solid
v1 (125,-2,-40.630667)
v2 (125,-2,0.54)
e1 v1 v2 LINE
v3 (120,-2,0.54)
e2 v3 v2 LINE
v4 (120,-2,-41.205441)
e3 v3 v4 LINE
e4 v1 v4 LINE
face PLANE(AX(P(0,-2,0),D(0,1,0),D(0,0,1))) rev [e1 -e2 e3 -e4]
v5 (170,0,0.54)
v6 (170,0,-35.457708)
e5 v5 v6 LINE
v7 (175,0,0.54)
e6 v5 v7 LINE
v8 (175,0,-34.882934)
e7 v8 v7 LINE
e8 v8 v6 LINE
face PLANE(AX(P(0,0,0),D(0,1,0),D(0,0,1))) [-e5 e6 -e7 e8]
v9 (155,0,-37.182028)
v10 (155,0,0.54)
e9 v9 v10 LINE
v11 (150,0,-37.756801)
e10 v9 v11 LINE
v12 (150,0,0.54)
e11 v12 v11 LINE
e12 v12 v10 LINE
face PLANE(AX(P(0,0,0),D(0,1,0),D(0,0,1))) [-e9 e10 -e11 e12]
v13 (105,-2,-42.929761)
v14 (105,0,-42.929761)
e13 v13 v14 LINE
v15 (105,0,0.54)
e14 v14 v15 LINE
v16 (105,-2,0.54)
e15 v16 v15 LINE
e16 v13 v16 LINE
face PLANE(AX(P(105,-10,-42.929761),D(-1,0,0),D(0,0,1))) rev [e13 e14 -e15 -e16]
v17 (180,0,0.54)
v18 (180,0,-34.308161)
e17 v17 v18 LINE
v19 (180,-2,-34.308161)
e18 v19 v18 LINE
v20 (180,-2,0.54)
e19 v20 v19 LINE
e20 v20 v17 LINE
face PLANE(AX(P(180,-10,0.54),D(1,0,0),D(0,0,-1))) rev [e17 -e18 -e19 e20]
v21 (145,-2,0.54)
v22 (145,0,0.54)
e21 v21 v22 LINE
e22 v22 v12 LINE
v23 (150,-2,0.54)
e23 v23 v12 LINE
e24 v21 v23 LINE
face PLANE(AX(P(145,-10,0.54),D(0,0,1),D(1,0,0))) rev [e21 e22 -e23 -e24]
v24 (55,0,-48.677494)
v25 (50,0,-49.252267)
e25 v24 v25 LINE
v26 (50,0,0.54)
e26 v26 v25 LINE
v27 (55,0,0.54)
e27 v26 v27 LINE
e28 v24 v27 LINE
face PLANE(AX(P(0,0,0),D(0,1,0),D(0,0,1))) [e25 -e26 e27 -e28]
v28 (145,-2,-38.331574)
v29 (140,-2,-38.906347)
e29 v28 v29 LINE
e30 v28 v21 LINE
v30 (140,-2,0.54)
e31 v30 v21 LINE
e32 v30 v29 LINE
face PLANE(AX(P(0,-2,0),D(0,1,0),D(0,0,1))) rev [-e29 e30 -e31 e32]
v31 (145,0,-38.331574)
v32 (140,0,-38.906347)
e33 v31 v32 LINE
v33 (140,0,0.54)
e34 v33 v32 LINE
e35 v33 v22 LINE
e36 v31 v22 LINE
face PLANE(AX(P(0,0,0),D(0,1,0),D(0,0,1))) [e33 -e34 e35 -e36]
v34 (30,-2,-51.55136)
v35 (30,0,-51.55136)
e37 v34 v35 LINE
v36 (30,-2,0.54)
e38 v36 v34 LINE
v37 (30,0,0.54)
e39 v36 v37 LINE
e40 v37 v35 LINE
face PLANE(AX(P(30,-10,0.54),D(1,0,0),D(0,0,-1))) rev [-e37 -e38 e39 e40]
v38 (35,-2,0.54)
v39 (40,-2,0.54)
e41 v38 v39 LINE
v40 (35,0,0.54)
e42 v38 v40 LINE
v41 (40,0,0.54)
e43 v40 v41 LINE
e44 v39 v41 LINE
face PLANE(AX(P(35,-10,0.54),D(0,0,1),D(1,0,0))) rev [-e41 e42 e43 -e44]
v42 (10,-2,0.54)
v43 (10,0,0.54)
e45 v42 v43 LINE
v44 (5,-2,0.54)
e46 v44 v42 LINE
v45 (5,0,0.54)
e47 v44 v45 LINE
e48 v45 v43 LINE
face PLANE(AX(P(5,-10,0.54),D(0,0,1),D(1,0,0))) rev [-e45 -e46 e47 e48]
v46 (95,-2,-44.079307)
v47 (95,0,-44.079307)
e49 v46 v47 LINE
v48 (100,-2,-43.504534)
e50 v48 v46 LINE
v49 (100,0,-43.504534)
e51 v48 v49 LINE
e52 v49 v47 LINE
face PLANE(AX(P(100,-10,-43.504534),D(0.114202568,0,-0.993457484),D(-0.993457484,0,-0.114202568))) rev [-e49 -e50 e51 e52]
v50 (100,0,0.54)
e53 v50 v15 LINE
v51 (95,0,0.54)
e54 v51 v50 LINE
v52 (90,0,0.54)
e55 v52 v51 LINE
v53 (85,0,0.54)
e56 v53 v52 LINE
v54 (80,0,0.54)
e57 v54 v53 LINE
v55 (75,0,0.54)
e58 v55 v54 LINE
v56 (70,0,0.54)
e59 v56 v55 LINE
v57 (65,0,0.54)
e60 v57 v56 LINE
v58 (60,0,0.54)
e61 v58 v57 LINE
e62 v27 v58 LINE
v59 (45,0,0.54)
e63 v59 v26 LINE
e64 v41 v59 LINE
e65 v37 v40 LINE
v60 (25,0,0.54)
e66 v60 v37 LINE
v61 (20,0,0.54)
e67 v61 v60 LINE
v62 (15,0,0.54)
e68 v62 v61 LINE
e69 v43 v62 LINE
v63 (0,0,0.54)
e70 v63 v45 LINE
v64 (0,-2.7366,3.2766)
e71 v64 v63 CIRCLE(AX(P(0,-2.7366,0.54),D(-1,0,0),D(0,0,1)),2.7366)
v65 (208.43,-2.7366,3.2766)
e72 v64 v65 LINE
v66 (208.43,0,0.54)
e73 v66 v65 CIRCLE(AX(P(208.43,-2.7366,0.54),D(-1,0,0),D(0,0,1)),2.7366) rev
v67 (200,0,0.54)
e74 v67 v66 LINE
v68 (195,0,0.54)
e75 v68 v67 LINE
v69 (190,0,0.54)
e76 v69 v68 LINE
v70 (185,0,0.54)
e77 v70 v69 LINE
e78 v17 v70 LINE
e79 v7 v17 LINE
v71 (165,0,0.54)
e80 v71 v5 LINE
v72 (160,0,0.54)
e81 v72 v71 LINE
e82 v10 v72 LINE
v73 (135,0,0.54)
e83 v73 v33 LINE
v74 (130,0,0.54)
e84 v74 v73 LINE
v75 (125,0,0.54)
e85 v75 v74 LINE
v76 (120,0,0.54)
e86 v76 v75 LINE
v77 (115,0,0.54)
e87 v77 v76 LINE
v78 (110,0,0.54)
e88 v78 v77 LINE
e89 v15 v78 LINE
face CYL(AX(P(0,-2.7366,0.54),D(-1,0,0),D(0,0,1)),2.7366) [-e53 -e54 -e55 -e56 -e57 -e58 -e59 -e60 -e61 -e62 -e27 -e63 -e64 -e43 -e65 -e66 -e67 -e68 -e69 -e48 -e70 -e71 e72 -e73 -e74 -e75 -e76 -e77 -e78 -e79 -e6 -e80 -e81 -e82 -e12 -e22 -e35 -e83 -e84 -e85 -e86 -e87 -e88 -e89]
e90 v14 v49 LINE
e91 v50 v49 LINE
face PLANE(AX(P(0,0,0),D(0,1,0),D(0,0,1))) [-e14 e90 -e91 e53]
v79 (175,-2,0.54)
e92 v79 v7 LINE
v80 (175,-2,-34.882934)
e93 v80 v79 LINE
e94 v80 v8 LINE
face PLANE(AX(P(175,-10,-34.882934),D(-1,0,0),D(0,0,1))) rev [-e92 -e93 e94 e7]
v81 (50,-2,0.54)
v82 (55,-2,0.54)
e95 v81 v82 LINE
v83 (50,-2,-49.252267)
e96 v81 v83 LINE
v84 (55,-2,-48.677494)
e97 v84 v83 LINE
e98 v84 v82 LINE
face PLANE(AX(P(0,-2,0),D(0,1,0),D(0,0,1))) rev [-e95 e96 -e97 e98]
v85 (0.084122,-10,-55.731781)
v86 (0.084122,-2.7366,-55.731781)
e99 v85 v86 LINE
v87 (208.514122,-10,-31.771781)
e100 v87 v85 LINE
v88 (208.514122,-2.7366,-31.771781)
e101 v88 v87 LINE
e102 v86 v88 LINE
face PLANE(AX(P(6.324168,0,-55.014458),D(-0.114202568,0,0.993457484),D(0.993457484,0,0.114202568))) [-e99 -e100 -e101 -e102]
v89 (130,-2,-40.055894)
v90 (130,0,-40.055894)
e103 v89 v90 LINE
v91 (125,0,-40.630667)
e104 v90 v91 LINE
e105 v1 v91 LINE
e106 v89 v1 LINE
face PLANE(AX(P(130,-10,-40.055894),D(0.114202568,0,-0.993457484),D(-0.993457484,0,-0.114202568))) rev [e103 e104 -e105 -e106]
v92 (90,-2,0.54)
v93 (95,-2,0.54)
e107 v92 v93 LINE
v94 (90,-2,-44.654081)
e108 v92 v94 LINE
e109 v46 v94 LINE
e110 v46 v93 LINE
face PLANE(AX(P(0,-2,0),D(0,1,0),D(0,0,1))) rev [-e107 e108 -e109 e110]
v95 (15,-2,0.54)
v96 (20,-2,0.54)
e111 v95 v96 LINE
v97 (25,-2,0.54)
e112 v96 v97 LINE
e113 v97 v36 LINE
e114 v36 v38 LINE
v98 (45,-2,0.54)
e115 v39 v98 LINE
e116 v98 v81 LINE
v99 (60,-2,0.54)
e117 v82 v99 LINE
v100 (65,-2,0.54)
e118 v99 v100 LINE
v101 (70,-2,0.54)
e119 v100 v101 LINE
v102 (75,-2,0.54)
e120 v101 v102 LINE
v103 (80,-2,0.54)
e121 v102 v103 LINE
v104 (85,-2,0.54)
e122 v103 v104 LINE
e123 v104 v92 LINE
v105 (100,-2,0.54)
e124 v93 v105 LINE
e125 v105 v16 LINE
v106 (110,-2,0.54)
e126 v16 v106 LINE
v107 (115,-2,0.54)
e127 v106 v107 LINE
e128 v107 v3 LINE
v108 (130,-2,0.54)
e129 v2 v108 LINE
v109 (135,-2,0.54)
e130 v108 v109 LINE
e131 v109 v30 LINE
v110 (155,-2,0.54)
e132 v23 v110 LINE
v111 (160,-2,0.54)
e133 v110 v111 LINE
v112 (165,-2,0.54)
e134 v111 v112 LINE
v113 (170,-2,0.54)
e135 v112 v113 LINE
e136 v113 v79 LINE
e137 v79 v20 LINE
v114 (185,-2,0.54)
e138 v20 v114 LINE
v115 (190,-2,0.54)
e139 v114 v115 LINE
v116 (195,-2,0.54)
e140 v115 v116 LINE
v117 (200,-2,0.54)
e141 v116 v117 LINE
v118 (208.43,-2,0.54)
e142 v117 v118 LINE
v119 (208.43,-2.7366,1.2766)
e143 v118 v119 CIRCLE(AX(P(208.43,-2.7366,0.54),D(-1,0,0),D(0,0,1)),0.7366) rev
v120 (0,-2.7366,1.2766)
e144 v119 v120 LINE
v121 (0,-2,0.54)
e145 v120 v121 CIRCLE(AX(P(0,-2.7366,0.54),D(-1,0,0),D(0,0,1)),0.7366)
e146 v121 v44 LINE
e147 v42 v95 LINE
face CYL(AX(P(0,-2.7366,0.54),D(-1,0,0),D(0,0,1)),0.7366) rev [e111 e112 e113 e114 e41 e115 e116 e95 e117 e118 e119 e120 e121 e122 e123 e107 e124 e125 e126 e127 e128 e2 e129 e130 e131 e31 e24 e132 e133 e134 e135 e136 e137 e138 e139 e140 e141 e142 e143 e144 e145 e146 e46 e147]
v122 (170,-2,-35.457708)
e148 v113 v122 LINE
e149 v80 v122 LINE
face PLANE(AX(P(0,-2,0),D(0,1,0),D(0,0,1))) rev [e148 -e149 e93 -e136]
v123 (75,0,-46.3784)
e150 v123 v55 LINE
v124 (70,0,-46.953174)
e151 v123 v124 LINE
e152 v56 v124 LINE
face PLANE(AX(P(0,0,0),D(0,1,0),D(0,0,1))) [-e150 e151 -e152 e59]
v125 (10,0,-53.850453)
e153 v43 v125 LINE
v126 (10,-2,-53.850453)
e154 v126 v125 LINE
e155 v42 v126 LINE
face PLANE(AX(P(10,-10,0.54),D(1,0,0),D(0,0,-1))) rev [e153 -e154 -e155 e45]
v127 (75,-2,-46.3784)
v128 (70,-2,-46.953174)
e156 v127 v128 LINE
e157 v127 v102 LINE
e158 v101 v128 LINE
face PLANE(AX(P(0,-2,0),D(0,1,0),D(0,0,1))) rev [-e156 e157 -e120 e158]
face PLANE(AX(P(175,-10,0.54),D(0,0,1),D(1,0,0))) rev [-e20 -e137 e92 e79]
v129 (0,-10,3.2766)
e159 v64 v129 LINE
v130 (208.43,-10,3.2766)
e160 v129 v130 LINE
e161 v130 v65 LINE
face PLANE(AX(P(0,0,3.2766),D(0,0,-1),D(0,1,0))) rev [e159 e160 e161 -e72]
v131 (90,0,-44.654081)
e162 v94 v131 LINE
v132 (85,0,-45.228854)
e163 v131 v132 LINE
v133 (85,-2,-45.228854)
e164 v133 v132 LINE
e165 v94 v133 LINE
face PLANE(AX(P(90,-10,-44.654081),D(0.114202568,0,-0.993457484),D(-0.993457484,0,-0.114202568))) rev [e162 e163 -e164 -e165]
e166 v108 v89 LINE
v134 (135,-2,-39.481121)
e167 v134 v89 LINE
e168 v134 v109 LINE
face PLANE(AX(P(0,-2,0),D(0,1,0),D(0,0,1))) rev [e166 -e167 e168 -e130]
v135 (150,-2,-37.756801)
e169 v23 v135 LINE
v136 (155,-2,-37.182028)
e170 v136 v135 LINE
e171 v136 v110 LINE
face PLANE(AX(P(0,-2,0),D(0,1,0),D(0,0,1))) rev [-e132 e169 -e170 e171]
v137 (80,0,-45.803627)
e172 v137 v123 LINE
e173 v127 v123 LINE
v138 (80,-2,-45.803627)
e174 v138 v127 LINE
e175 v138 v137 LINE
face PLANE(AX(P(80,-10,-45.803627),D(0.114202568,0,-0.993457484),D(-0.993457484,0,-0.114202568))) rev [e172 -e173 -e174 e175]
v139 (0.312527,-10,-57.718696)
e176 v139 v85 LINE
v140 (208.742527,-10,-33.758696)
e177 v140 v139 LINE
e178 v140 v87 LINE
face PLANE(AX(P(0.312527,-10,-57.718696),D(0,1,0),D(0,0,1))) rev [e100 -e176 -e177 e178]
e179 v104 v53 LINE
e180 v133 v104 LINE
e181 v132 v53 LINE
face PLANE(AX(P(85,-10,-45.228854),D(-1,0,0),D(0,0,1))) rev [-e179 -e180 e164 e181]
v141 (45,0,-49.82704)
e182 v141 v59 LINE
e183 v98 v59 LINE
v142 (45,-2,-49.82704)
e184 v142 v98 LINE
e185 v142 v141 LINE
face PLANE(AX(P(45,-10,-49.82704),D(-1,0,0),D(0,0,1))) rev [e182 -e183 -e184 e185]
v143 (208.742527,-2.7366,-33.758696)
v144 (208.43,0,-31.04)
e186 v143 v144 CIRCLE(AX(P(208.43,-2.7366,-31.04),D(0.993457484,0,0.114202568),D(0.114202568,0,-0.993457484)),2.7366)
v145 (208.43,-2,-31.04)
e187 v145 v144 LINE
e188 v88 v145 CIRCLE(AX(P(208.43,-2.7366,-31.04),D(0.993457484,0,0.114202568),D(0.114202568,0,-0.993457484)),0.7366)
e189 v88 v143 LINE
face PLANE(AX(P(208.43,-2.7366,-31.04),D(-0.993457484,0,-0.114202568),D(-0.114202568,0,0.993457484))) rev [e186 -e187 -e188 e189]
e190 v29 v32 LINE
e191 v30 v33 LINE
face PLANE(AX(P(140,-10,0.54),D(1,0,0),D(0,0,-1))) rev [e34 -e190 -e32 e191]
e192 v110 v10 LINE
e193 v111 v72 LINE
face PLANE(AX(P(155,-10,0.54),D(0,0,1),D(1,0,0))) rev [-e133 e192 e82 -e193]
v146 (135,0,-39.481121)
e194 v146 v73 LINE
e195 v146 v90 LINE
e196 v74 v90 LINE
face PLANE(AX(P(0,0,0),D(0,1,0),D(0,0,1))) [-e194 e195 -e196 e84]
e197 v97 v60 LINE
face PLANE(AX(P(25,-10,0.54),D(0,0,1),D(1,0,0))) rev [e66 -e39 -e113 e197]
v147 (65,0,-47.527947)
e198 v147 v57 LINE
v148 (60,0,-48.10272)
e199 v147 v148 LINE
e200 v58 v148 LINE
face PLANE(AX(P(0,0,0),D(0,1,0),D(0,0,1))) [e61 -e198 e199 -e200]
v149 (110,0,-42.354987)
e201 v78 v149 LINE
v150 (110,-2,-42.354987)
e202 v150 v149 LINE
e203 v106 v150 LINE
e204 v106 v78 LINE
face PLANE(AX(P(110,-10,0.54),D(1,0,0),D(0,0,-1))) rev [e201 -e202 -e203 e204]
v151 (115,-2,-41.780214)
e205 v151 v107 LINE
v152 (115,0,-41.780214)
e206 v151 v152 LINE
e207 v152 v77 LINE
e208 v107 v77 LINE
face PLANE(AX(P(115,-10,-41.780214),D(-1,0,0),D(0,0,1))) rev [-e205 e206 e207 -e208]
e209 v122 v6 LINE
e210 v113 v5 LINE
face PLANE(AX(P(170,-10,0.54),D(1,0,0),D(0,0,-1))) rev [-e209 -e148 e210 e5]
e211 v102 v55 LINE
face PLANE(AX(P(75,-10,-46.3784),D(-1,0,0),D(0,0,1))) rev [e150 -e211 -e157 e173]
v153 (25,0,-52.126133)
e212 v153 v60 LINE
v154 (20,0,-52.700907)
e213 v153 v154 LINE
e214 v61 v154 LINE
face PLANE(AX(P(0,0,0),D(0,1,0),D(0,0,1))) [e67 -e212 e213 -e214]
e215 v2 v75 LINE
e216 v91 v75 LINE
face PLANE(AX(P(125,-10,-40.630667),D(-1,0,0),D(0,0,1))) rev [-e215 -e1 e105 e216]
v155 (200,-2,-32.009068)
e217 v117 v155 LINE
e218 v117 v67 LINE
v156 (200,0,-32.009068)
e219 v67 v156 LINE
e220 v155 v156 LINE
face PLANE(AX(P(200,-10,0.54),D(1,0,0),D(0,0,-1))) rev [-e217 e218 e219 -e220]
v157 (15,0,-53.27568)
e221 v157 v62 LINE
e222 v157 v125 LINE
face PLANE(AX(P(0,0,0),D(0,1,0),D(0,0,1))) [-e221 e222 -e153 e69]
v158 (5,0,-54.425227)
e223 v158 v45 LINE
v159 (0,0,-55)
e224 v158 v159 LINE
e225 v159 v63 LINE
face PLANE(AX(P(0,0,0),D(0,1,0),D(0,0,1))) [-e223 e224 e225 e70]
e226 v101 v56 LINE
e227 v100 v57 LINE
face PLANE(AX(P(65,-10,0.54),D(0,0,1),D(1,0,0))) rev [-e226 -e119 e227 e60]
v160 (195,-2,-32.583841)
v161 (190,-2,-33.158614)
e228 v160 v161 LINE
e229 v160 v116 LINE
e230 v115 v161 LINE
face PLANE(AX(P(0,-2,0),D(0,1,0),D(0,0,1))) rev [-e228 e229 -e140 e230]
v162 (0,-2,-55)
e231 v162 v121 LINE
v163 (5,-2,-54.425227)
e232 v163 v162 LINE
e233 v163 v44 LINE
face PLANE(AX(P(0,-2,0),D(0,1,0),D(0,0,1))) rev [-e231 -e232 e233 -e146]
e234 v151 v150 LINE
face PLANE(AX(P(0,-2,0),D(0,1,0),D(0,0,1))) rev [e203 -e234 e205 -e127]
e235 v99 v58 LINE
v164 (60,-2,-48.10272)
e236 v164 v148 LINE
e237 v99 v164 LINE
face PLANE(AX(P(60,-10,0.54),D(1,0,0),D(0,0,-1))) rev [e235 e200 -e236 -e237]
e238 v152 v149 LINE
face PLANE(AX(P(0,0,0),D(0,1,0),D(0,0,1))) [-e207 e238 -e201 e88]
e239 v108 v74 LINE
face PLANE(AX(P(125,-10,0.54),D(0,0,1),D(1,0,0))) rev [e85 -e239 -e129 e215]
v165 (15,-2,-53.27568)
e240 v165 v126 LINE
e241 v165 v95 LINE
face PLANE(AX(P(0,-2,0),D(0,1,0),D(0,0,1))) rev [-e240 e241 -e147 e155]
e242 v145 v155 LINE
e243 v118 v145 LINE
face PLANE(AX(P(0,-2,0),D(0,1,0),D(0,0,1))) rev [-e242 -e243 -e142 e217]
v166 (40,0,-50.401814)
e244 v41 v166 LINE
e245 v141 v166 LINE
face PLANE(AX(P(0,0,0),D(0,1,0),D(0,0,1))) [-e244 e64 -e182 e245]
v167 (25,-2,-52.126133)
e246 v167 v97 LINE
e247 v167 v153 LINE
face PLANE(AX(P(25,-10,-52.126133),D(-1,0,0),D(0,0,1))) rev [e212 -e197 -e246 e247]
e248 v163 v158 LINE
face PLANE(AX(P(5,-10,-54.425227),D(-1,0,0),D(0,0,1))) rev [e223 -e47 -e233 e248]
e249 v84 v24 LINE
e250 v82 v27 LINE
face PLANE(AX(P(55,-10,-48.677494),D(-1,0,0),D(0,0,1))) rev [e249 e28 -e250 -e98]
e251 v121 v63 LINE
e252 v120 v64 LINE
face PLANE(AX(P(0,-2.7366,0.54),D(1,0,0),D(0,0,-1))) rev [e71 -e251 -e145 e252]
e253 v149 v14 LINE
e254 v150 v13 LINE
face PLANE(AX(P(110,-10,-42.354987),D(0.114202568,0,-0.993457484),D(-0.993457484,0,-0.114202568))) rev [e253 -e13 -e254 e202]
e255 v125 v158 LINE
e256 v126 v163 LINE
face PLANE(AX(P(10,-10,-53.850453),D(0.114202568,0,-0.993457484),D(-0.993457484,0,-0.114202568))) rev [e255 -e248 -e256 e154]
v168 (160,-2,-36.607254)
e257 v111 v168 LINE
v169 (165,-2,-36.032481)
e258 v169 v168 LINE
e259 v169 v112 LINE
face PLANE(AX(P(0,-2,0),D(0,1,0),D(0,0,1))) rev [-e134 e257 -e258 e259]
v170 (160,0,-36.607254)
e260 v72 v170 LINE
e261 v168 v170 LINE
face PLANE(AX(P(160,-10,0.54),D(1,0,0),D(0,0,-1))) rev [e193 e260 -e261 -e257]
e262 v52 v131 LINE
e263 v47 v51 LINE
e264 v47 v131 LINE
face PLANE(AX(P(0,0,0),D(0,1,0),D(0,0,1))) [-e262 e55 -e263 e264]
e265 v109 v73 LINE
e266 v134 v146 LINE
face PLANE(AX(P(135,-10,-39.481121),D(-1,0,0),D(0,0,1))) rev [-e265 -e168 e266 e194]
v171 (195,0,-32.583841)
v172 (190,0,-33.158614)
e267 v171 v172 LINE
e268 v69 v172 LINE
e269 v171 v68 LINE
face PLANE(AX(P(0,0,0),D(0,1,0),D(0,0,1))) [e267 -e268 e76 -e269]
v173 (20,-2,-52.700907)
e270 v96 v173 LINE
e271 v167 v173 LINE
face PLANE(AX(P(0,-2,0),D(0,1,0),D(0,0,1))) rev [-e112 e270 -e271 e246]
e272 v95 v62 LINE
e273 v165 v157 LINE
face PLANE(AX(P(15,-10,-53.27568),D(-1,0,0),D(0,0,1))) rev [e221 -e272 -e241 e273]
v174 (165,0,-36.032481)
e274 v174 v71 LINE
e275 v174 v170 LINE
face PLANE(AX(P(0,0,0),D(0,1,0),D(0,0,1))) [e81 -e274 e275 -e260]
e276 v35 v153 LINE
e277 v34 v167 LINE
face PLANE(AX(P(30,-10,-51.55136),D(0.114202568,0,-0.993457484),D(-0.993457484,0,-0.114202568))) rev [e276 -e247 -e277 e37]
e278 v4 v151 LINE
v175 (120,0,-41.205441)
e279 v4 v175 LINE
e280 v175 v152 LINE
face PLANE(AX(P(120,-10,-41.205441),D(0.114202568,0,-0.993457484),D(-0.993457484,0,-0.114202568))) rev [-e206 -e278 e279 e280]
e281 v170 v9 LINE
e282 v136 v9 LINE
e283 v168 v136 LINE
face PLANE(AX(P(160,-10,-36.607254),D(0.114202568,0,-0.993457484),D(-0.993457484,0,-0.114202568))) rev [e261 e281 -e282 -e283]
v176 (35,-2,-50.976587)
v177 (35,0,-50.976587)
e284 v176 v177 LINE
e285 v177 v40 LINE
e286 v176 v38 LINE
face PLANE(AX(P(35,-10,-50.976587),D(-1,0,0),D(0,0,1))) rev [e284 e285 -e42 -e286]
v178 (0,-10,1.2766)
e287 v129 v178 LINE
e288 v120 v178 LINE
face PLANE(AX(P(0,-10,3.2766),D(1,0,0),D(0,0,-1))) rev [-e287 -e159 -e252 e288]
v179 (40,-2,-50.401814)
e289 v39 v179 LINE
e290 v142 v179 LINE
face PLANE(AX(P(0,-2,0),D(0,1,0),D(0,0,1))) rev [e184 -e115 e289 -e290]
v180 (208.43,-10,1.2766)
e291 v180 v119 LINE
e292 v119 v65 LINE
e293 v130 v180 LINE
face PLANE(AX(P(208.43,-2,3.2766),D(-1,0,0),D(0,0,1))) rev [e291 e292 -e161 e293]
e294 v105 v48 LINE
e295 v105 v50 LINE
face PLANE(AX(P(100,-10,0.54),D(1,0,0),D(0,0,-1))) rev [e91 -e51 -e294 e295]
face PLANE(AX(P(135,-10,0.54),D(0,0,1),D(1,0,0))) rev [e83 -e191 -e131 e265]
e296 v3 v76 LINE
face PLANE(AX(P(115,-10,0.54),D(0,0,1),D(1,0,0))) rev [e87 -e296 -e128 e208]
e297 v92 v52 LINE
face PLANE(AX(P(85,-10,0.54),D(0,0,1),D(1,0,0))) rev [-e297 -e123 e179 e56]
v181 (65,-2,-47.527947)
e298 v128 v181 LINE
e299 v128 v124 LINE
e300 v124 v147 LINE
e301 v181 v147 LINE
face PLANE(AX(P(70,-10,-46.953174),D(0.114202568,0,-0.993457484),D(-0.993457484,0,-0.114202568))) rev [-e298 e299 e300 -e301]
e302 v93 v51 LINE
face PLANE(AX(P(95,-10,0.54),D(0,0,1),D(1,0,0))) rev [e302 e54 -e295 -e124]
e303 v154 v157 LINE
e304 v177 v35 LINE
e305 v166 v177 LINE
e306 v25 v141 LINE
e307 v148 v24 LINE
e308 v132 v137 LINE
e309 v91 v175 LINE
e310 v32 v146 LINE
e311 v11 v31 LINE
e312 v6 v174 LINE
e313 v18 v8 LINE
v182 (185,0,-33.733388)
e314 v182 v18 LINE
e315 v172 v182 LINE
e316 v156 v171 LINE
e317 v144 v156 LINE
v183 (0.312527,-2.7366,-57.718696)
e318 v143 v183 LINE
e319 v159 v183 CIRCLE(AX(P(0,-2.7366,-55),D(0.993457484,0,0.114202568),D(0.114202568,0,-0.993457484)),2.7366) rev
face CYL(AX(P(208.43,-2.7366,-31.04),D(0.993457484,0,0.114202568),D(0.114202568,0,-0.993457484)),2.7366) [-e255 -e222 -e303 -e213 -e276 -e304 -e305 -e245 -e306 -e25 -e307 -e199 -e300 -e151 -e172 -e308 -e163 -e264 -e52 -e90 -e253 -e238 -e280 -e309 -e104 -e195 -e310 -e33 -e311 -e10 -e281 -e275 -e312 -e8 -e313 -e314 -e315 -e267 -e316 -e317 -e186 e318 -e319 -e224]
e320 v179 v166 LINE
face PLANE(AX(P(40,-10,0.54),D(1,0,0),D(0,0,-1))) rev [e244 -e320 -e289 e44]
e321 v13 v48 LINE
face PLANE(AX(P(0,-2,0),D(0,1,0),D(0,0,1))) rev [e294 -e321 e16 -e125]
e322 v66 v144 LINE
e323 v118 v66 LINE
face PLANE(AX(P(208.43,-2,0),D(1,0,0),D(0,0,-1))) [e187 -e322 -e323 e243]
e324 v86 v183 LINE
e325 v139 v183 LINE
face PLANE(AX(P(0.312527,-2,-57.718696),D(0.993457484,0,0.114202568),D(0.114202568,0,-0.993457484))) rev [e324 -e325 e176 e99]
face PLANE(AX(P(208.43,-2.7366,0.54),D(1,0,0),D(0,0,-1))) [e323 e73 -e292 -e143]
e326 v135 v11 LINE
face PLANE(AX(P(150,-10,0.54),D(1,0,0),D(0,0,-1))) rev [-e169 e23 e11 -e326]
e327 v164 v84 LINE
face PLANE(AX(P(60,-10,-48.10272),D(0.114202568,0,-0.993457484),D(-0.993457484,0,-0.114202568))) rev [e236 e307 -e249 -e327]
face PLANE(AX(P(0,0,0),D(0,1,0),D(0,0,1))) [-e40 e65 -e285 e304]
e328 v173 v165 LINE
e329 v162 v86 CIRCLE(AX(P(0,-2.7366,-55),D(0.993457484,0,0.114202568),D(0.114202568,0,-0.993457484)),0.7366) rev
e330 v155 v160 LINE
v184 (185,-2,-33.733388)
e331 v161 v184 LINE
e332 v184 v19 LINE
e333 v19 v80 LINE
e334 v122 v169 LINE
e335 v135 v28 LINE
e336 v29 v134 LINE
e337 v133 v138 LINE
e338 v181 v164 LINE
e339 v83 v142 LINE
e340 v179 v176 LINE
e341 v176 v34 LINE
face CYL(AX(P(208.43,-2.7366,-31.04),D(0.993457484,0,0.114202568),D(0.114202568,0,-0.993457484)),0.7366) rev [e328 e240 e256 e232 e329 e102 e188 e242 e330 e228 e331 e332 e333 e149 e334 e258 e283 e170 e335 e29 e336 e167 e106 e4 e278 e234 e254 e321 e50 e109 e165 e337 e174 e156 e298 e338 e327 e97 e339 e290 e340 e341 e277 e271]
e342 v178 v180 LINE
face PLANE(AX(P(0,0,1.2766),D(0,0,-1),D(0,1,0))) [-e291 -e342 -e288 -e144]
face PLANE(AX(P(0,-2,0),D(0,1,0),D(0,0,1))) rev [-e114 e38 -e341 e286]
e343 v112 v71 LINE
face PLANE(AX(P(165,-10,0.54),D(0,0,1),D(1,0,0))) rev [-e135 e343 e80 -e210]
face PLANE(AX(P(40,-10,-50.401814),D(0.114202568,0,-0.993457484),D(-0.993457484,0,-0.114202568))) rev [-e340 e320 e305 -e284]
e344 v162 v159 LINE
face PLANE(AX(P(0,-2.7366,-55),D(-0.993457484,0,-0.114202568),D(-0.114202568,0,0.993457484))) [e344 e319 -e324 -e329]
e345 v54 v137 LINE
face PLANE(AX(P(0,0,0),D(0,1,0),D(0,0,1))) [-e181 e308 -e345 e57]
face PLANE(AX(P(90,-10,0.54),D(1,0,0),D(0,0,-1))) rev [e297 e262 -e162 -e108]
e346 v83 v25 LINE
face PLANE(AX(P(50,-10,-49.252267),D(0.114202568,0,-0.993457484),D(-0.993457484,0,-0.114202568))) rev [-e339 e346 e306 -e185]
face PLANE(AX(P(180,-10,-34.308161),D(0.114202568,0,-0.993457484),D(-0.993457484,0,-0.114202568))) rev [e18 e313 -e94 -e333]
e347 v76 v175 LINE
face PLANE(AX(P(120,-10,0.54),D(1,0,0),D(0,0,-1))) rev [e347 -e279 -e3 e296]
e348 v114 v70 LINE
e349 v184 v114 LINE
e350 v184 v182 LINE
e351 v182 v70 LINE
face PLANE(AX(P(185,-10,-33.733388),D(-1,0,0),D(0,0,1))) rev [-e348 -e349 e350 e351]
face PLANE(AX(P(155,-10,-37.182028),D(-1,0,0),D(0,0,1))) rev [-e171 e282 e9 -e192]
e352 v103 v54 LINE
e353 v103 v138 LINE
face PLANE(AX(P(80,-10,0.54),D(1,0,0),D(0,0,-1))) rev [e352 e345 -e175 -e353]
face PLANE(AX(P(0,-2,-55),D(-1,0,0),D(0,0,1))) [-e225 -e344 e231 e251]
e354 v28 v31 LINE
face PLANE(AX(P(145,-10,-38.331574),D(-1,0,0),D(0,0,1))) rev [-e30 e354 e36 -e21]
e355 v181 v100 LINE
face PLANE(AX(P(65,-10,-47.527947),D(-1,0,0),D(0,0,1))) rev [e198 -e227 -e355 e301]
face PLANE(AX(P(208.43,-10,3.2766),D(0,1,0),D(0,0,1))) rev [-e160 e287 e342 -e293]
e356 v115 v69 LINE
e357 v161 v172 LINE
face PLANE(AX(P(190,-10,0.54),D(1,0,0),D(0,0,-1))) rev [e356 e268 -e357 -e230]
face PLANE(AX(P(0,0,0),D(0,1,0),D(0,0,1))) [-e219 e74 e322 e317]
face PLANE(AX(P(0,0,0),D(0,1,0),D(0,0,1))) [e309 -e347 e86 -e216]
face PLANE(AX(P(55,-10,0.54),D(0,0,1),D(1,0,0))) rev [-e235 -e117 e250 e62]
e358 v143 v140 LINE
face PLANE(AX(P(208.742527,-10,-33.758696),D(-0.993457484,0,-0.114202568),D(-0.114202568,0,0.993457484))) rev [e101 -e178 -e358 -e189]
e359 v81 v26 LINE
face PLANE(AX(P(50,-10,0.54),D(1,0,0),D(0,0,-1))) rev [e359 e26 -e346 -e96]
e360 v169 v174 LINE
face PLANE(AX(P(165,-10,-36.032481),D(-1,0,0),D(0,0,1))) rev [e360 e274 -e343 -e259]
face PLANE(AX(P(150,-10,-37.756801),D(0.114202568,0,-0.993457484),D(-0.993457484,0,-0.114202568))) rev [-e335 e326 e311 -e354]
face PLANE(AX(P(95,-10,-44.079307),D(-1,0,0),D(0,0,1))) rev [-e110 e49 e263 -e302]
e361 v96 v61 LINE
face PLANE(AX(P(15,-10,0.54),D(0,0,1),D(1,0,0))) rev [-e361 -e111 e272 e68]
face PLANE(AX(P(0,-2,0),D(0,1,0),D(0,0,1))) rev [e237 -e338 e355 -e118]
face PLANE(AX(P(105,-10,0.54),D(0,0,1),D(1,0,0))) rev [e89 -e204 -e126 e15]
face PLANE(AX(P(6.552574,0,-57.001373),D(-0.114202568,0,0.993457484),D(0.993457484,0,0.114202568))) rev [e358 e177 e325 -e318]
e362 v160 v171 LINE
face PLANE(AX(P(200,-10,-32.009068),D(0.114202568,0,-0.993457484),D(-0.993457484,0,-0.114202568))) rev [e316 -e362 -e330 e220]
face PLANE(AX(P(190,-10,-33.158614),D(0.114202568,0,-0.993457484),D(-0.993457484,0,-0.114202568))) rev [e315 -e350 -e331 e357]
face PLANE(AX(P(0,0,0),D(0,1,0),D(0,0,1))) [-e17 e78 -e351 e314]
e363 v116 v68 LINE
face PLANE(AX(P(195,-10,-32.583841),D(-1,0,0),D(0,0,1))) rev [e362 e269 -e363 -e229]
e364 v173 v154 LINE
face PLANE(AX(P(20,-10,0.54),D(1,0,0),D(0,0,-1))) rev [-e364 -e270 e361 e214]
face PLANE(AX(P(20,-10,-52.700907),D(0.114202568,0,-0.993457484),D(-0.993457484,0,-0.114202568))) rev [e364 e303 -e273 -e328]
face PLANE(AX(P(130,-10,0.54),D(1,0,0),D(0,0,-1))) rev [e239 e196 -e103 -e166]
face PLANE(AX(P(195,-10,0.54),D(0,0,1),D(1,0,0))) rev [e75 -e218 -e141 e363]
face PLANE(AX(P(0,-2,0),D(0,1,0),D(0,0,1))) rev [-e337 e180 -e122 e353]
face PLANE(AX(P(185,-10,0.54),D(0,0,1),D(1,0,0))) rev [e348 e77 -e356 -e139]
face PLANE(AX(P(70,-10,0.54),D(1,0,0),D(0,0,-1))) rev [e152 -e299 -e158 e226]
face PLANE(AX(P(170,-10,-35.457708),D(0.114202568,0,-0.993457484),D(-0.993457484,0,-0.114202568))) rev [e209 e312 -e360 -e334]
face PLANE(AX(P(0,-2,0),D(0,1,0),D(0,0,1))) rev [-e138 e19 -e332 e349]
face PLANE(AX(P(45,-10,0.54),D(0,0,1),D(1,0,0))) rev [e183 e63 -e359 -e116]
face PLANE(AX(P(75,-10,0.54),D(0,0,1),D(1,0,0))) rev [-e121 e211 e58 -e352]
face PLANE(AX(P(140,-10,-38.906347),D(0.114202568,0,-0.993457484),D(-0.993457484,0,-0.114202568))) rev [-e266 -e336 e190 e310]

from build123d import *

# Parameters (mm, degrees)
BASE_FLANGE1_DEPTH = 2
EDGE_FLANGE1_DEPTH = 209.802637019
EDGE_FLANGE2_DEPTH = 208.43
CUT_EXTRUDE1_DEPTH = 10
CUT_EXTRUDE2_DEPTH = 10
CUT_EXTRUDE3_DEPTH = 10
CUT_EXTRUDE4_DEPTH = 10


# Sheet-metal steps are written as plain solids
with BuildPart() as part:
    # Sketch1 → Base-Flange1 (new body)
    with BuildSketch(Plane(origin=(0, 0, 0), x_dir=(1, 0, 0), z_dir=(0, 1, 0))):
        Polygon((0, 0), (208.43, 0), (208.43, 31.04), (0, 55), align=None)
    extrude(amount=-BASE_FLANGE1_DEPTH)

    # Edge-Flange1 section (across the edge) → Edge-Flange1 (add)
    with BuildSketch(Plane(origin=(0.084121612, -2, -55.731780783), x_dir=(-0.1142025683779395, -3.4914813388431334e-15, 0.9934574844329687), z_dir=(0.9934574844329687, 0, 0.1142025683779395))):
        with BuildLine():
            Line((-2, 0.7366), (-2, 8))
            Line((-2, 8), (0, 8))
            Line((0, 8), (0, 0.7366))
            ThreePointArc((0, 0.7366), (0.215745145, 0.215745145), (0.7366, 0))
            Line((0.7366, 0), (0.7366, -2))
            ThreePointArc((0.7366, -2), (-1.198468417, -1.198468417), (-2, 0.7366))
        make_face()
    extrude(amount=EDGE_FLANGE1_DEPTH)

    # Edge-Flange2 section (across the edge) → Edge-Flange2 (add)
    with BuildSketch(Plane(origin=(208.43, -2, 1.2766), x_dir=(0, 0, -1), z_dir=(-1, 0, 0))):
        with BuildLine():
            Line((-2, 0.7366), (-2, 8))
            Line((-2, 8), (0, 8))
            Line((0, 8), (0, 0.7366))
            ThreePointArc((0, 0.7366), (0.215745145, 0.215745145), (0.7366, 0))
            Line((0.7366, 0), (1.2766, 0))
            Line((1.2766, 0), (1.2766, -2))
            Line((1.2766, -2), (0.7366, -2))
            ThreePointArc((0.7366, -2), (-1.198468417, -1.198468417), (-2, 0.7366))
        make_face()
    extrude(amount=EDGE_FLANGE2_DEPTH)

    # Sketch12 → Cut-Extrude1 (cut)
    with BuildSketch(Plane(origin=(0, 0, 0), x_dir=(1, 0, 0), z_dir=(0, 1, 0))):
        Polygon((5, 54.425226695), (5, -0.54), (10, -0.54), (10, 53.85045339), align=None)
    extrude(amount=-CUT_EXTRUDE1_DEPTH, mode=Mode.SUBTRACT)

    # Sketch13 → Cut-Extrude2 (cut)
    with BuildSketch(Plane(origin=(0, 0, 0), x_dir=(1, 0, 0), z_dir=(0, 1, 0))):
        Polygon((15, 53.275680084), (15, -0.54), (20, -0.54), (20, 52.700906779), align=None)
        Polygon((25, 52.126133474), (25, -0.54), (30, -0.54), (30, 51.551360169), align=None)
        Polygon((35, 50.976586864), (35, -0.54), (40, -0.54), (40, 50.401813559), align=None)
        Polygon((45, 49.827040253), (45, -0.54), (50, -0.54), (50, 49.252266948), align=None)
    extrude(amount=-CUT_EXTRUDE2_DEPTH, mode=Mode.SUBTRACT)

    # Sketch14 → Cut-Extrude3 (cut)
    with BuildSketch(Plane(origin=(0, 0, 0), x_dir=(1, 0, 0), z_dir=(0, 1, 0))):
        Polygon((55, 48.677493643), (55, -0.54), (60, -0.54), (60, 48.102720338), align=None)
        Polygon((65, 47.527947033), (65, -0.54), (70, -0.54), (70, 46.953173727), align=None)
        Polygon((75, 46.378400422), (75, -0.54), (80, -0.54), (80, 45.803627117), align=None)
        Polygon((85, 45.228853812), (85, -0.54), (90, -0.54), (90, 44.654080507), align=None)
        Polygon((95, 44.079307201), (95, -0.54), (100, -0.54), (100, 43.504533896), align=None)
        Polygon((105, 42.929760591), (105, -0.54), (110, -0.54), (110, 42.354987286), align=None)
        Polygon((115, 41.780213981), (115, -0.54), (120, -0.54), (120, 41.205440676), align=None)
    extrude(amount=-CUT_EXTRUDE3_DEPTH, mode=Mode.SUBTRACT)

    # Sketch15 → Cut-Extrude4 (cut)
    with BuildSketch(Plane(origin=(0, 0, 0), x_dir=(1, 0, 0), z_dir=(0, 1, 0))):
        Polygon((125, 40.63066737), (125, -0.54), (130, -0.54), (130, 40.055894065), align=None)
        Polygon((135, 39.48112076), (135, -0.54), (140, -0.54), (140, 38.906347455), align=None)
        Polygon((145, 38.33157415), (145, -0.54), (150, -0.54), (150, 37.756800844), align=None)
        Polygon((155, 37.182027539), (155, -0.54), (160, -0.54), (160, 36.607254234), align=None)
        Polygon((165, 36.032480929), (165, -0.54), (170, -0.54), (170, 35.457707624), align=None)
        Polygon((175, 34.882934318), (175, -0.54), (180, -0.54), (180, 34.308161013), align=None)
        Polygon((185, 33.733387708), (185, -0.54), (190, -0.54), (190, 33.158614403), align=None)
        Polygon((195, 32.583841098), (195, -0.54), (200, -0.54), (200, 32.009067793), align=None)
    extrude(amount=-CUT_EXTRUDE4_DEPTH, mode=Mode.SUBTRACT)


solid = part.part
